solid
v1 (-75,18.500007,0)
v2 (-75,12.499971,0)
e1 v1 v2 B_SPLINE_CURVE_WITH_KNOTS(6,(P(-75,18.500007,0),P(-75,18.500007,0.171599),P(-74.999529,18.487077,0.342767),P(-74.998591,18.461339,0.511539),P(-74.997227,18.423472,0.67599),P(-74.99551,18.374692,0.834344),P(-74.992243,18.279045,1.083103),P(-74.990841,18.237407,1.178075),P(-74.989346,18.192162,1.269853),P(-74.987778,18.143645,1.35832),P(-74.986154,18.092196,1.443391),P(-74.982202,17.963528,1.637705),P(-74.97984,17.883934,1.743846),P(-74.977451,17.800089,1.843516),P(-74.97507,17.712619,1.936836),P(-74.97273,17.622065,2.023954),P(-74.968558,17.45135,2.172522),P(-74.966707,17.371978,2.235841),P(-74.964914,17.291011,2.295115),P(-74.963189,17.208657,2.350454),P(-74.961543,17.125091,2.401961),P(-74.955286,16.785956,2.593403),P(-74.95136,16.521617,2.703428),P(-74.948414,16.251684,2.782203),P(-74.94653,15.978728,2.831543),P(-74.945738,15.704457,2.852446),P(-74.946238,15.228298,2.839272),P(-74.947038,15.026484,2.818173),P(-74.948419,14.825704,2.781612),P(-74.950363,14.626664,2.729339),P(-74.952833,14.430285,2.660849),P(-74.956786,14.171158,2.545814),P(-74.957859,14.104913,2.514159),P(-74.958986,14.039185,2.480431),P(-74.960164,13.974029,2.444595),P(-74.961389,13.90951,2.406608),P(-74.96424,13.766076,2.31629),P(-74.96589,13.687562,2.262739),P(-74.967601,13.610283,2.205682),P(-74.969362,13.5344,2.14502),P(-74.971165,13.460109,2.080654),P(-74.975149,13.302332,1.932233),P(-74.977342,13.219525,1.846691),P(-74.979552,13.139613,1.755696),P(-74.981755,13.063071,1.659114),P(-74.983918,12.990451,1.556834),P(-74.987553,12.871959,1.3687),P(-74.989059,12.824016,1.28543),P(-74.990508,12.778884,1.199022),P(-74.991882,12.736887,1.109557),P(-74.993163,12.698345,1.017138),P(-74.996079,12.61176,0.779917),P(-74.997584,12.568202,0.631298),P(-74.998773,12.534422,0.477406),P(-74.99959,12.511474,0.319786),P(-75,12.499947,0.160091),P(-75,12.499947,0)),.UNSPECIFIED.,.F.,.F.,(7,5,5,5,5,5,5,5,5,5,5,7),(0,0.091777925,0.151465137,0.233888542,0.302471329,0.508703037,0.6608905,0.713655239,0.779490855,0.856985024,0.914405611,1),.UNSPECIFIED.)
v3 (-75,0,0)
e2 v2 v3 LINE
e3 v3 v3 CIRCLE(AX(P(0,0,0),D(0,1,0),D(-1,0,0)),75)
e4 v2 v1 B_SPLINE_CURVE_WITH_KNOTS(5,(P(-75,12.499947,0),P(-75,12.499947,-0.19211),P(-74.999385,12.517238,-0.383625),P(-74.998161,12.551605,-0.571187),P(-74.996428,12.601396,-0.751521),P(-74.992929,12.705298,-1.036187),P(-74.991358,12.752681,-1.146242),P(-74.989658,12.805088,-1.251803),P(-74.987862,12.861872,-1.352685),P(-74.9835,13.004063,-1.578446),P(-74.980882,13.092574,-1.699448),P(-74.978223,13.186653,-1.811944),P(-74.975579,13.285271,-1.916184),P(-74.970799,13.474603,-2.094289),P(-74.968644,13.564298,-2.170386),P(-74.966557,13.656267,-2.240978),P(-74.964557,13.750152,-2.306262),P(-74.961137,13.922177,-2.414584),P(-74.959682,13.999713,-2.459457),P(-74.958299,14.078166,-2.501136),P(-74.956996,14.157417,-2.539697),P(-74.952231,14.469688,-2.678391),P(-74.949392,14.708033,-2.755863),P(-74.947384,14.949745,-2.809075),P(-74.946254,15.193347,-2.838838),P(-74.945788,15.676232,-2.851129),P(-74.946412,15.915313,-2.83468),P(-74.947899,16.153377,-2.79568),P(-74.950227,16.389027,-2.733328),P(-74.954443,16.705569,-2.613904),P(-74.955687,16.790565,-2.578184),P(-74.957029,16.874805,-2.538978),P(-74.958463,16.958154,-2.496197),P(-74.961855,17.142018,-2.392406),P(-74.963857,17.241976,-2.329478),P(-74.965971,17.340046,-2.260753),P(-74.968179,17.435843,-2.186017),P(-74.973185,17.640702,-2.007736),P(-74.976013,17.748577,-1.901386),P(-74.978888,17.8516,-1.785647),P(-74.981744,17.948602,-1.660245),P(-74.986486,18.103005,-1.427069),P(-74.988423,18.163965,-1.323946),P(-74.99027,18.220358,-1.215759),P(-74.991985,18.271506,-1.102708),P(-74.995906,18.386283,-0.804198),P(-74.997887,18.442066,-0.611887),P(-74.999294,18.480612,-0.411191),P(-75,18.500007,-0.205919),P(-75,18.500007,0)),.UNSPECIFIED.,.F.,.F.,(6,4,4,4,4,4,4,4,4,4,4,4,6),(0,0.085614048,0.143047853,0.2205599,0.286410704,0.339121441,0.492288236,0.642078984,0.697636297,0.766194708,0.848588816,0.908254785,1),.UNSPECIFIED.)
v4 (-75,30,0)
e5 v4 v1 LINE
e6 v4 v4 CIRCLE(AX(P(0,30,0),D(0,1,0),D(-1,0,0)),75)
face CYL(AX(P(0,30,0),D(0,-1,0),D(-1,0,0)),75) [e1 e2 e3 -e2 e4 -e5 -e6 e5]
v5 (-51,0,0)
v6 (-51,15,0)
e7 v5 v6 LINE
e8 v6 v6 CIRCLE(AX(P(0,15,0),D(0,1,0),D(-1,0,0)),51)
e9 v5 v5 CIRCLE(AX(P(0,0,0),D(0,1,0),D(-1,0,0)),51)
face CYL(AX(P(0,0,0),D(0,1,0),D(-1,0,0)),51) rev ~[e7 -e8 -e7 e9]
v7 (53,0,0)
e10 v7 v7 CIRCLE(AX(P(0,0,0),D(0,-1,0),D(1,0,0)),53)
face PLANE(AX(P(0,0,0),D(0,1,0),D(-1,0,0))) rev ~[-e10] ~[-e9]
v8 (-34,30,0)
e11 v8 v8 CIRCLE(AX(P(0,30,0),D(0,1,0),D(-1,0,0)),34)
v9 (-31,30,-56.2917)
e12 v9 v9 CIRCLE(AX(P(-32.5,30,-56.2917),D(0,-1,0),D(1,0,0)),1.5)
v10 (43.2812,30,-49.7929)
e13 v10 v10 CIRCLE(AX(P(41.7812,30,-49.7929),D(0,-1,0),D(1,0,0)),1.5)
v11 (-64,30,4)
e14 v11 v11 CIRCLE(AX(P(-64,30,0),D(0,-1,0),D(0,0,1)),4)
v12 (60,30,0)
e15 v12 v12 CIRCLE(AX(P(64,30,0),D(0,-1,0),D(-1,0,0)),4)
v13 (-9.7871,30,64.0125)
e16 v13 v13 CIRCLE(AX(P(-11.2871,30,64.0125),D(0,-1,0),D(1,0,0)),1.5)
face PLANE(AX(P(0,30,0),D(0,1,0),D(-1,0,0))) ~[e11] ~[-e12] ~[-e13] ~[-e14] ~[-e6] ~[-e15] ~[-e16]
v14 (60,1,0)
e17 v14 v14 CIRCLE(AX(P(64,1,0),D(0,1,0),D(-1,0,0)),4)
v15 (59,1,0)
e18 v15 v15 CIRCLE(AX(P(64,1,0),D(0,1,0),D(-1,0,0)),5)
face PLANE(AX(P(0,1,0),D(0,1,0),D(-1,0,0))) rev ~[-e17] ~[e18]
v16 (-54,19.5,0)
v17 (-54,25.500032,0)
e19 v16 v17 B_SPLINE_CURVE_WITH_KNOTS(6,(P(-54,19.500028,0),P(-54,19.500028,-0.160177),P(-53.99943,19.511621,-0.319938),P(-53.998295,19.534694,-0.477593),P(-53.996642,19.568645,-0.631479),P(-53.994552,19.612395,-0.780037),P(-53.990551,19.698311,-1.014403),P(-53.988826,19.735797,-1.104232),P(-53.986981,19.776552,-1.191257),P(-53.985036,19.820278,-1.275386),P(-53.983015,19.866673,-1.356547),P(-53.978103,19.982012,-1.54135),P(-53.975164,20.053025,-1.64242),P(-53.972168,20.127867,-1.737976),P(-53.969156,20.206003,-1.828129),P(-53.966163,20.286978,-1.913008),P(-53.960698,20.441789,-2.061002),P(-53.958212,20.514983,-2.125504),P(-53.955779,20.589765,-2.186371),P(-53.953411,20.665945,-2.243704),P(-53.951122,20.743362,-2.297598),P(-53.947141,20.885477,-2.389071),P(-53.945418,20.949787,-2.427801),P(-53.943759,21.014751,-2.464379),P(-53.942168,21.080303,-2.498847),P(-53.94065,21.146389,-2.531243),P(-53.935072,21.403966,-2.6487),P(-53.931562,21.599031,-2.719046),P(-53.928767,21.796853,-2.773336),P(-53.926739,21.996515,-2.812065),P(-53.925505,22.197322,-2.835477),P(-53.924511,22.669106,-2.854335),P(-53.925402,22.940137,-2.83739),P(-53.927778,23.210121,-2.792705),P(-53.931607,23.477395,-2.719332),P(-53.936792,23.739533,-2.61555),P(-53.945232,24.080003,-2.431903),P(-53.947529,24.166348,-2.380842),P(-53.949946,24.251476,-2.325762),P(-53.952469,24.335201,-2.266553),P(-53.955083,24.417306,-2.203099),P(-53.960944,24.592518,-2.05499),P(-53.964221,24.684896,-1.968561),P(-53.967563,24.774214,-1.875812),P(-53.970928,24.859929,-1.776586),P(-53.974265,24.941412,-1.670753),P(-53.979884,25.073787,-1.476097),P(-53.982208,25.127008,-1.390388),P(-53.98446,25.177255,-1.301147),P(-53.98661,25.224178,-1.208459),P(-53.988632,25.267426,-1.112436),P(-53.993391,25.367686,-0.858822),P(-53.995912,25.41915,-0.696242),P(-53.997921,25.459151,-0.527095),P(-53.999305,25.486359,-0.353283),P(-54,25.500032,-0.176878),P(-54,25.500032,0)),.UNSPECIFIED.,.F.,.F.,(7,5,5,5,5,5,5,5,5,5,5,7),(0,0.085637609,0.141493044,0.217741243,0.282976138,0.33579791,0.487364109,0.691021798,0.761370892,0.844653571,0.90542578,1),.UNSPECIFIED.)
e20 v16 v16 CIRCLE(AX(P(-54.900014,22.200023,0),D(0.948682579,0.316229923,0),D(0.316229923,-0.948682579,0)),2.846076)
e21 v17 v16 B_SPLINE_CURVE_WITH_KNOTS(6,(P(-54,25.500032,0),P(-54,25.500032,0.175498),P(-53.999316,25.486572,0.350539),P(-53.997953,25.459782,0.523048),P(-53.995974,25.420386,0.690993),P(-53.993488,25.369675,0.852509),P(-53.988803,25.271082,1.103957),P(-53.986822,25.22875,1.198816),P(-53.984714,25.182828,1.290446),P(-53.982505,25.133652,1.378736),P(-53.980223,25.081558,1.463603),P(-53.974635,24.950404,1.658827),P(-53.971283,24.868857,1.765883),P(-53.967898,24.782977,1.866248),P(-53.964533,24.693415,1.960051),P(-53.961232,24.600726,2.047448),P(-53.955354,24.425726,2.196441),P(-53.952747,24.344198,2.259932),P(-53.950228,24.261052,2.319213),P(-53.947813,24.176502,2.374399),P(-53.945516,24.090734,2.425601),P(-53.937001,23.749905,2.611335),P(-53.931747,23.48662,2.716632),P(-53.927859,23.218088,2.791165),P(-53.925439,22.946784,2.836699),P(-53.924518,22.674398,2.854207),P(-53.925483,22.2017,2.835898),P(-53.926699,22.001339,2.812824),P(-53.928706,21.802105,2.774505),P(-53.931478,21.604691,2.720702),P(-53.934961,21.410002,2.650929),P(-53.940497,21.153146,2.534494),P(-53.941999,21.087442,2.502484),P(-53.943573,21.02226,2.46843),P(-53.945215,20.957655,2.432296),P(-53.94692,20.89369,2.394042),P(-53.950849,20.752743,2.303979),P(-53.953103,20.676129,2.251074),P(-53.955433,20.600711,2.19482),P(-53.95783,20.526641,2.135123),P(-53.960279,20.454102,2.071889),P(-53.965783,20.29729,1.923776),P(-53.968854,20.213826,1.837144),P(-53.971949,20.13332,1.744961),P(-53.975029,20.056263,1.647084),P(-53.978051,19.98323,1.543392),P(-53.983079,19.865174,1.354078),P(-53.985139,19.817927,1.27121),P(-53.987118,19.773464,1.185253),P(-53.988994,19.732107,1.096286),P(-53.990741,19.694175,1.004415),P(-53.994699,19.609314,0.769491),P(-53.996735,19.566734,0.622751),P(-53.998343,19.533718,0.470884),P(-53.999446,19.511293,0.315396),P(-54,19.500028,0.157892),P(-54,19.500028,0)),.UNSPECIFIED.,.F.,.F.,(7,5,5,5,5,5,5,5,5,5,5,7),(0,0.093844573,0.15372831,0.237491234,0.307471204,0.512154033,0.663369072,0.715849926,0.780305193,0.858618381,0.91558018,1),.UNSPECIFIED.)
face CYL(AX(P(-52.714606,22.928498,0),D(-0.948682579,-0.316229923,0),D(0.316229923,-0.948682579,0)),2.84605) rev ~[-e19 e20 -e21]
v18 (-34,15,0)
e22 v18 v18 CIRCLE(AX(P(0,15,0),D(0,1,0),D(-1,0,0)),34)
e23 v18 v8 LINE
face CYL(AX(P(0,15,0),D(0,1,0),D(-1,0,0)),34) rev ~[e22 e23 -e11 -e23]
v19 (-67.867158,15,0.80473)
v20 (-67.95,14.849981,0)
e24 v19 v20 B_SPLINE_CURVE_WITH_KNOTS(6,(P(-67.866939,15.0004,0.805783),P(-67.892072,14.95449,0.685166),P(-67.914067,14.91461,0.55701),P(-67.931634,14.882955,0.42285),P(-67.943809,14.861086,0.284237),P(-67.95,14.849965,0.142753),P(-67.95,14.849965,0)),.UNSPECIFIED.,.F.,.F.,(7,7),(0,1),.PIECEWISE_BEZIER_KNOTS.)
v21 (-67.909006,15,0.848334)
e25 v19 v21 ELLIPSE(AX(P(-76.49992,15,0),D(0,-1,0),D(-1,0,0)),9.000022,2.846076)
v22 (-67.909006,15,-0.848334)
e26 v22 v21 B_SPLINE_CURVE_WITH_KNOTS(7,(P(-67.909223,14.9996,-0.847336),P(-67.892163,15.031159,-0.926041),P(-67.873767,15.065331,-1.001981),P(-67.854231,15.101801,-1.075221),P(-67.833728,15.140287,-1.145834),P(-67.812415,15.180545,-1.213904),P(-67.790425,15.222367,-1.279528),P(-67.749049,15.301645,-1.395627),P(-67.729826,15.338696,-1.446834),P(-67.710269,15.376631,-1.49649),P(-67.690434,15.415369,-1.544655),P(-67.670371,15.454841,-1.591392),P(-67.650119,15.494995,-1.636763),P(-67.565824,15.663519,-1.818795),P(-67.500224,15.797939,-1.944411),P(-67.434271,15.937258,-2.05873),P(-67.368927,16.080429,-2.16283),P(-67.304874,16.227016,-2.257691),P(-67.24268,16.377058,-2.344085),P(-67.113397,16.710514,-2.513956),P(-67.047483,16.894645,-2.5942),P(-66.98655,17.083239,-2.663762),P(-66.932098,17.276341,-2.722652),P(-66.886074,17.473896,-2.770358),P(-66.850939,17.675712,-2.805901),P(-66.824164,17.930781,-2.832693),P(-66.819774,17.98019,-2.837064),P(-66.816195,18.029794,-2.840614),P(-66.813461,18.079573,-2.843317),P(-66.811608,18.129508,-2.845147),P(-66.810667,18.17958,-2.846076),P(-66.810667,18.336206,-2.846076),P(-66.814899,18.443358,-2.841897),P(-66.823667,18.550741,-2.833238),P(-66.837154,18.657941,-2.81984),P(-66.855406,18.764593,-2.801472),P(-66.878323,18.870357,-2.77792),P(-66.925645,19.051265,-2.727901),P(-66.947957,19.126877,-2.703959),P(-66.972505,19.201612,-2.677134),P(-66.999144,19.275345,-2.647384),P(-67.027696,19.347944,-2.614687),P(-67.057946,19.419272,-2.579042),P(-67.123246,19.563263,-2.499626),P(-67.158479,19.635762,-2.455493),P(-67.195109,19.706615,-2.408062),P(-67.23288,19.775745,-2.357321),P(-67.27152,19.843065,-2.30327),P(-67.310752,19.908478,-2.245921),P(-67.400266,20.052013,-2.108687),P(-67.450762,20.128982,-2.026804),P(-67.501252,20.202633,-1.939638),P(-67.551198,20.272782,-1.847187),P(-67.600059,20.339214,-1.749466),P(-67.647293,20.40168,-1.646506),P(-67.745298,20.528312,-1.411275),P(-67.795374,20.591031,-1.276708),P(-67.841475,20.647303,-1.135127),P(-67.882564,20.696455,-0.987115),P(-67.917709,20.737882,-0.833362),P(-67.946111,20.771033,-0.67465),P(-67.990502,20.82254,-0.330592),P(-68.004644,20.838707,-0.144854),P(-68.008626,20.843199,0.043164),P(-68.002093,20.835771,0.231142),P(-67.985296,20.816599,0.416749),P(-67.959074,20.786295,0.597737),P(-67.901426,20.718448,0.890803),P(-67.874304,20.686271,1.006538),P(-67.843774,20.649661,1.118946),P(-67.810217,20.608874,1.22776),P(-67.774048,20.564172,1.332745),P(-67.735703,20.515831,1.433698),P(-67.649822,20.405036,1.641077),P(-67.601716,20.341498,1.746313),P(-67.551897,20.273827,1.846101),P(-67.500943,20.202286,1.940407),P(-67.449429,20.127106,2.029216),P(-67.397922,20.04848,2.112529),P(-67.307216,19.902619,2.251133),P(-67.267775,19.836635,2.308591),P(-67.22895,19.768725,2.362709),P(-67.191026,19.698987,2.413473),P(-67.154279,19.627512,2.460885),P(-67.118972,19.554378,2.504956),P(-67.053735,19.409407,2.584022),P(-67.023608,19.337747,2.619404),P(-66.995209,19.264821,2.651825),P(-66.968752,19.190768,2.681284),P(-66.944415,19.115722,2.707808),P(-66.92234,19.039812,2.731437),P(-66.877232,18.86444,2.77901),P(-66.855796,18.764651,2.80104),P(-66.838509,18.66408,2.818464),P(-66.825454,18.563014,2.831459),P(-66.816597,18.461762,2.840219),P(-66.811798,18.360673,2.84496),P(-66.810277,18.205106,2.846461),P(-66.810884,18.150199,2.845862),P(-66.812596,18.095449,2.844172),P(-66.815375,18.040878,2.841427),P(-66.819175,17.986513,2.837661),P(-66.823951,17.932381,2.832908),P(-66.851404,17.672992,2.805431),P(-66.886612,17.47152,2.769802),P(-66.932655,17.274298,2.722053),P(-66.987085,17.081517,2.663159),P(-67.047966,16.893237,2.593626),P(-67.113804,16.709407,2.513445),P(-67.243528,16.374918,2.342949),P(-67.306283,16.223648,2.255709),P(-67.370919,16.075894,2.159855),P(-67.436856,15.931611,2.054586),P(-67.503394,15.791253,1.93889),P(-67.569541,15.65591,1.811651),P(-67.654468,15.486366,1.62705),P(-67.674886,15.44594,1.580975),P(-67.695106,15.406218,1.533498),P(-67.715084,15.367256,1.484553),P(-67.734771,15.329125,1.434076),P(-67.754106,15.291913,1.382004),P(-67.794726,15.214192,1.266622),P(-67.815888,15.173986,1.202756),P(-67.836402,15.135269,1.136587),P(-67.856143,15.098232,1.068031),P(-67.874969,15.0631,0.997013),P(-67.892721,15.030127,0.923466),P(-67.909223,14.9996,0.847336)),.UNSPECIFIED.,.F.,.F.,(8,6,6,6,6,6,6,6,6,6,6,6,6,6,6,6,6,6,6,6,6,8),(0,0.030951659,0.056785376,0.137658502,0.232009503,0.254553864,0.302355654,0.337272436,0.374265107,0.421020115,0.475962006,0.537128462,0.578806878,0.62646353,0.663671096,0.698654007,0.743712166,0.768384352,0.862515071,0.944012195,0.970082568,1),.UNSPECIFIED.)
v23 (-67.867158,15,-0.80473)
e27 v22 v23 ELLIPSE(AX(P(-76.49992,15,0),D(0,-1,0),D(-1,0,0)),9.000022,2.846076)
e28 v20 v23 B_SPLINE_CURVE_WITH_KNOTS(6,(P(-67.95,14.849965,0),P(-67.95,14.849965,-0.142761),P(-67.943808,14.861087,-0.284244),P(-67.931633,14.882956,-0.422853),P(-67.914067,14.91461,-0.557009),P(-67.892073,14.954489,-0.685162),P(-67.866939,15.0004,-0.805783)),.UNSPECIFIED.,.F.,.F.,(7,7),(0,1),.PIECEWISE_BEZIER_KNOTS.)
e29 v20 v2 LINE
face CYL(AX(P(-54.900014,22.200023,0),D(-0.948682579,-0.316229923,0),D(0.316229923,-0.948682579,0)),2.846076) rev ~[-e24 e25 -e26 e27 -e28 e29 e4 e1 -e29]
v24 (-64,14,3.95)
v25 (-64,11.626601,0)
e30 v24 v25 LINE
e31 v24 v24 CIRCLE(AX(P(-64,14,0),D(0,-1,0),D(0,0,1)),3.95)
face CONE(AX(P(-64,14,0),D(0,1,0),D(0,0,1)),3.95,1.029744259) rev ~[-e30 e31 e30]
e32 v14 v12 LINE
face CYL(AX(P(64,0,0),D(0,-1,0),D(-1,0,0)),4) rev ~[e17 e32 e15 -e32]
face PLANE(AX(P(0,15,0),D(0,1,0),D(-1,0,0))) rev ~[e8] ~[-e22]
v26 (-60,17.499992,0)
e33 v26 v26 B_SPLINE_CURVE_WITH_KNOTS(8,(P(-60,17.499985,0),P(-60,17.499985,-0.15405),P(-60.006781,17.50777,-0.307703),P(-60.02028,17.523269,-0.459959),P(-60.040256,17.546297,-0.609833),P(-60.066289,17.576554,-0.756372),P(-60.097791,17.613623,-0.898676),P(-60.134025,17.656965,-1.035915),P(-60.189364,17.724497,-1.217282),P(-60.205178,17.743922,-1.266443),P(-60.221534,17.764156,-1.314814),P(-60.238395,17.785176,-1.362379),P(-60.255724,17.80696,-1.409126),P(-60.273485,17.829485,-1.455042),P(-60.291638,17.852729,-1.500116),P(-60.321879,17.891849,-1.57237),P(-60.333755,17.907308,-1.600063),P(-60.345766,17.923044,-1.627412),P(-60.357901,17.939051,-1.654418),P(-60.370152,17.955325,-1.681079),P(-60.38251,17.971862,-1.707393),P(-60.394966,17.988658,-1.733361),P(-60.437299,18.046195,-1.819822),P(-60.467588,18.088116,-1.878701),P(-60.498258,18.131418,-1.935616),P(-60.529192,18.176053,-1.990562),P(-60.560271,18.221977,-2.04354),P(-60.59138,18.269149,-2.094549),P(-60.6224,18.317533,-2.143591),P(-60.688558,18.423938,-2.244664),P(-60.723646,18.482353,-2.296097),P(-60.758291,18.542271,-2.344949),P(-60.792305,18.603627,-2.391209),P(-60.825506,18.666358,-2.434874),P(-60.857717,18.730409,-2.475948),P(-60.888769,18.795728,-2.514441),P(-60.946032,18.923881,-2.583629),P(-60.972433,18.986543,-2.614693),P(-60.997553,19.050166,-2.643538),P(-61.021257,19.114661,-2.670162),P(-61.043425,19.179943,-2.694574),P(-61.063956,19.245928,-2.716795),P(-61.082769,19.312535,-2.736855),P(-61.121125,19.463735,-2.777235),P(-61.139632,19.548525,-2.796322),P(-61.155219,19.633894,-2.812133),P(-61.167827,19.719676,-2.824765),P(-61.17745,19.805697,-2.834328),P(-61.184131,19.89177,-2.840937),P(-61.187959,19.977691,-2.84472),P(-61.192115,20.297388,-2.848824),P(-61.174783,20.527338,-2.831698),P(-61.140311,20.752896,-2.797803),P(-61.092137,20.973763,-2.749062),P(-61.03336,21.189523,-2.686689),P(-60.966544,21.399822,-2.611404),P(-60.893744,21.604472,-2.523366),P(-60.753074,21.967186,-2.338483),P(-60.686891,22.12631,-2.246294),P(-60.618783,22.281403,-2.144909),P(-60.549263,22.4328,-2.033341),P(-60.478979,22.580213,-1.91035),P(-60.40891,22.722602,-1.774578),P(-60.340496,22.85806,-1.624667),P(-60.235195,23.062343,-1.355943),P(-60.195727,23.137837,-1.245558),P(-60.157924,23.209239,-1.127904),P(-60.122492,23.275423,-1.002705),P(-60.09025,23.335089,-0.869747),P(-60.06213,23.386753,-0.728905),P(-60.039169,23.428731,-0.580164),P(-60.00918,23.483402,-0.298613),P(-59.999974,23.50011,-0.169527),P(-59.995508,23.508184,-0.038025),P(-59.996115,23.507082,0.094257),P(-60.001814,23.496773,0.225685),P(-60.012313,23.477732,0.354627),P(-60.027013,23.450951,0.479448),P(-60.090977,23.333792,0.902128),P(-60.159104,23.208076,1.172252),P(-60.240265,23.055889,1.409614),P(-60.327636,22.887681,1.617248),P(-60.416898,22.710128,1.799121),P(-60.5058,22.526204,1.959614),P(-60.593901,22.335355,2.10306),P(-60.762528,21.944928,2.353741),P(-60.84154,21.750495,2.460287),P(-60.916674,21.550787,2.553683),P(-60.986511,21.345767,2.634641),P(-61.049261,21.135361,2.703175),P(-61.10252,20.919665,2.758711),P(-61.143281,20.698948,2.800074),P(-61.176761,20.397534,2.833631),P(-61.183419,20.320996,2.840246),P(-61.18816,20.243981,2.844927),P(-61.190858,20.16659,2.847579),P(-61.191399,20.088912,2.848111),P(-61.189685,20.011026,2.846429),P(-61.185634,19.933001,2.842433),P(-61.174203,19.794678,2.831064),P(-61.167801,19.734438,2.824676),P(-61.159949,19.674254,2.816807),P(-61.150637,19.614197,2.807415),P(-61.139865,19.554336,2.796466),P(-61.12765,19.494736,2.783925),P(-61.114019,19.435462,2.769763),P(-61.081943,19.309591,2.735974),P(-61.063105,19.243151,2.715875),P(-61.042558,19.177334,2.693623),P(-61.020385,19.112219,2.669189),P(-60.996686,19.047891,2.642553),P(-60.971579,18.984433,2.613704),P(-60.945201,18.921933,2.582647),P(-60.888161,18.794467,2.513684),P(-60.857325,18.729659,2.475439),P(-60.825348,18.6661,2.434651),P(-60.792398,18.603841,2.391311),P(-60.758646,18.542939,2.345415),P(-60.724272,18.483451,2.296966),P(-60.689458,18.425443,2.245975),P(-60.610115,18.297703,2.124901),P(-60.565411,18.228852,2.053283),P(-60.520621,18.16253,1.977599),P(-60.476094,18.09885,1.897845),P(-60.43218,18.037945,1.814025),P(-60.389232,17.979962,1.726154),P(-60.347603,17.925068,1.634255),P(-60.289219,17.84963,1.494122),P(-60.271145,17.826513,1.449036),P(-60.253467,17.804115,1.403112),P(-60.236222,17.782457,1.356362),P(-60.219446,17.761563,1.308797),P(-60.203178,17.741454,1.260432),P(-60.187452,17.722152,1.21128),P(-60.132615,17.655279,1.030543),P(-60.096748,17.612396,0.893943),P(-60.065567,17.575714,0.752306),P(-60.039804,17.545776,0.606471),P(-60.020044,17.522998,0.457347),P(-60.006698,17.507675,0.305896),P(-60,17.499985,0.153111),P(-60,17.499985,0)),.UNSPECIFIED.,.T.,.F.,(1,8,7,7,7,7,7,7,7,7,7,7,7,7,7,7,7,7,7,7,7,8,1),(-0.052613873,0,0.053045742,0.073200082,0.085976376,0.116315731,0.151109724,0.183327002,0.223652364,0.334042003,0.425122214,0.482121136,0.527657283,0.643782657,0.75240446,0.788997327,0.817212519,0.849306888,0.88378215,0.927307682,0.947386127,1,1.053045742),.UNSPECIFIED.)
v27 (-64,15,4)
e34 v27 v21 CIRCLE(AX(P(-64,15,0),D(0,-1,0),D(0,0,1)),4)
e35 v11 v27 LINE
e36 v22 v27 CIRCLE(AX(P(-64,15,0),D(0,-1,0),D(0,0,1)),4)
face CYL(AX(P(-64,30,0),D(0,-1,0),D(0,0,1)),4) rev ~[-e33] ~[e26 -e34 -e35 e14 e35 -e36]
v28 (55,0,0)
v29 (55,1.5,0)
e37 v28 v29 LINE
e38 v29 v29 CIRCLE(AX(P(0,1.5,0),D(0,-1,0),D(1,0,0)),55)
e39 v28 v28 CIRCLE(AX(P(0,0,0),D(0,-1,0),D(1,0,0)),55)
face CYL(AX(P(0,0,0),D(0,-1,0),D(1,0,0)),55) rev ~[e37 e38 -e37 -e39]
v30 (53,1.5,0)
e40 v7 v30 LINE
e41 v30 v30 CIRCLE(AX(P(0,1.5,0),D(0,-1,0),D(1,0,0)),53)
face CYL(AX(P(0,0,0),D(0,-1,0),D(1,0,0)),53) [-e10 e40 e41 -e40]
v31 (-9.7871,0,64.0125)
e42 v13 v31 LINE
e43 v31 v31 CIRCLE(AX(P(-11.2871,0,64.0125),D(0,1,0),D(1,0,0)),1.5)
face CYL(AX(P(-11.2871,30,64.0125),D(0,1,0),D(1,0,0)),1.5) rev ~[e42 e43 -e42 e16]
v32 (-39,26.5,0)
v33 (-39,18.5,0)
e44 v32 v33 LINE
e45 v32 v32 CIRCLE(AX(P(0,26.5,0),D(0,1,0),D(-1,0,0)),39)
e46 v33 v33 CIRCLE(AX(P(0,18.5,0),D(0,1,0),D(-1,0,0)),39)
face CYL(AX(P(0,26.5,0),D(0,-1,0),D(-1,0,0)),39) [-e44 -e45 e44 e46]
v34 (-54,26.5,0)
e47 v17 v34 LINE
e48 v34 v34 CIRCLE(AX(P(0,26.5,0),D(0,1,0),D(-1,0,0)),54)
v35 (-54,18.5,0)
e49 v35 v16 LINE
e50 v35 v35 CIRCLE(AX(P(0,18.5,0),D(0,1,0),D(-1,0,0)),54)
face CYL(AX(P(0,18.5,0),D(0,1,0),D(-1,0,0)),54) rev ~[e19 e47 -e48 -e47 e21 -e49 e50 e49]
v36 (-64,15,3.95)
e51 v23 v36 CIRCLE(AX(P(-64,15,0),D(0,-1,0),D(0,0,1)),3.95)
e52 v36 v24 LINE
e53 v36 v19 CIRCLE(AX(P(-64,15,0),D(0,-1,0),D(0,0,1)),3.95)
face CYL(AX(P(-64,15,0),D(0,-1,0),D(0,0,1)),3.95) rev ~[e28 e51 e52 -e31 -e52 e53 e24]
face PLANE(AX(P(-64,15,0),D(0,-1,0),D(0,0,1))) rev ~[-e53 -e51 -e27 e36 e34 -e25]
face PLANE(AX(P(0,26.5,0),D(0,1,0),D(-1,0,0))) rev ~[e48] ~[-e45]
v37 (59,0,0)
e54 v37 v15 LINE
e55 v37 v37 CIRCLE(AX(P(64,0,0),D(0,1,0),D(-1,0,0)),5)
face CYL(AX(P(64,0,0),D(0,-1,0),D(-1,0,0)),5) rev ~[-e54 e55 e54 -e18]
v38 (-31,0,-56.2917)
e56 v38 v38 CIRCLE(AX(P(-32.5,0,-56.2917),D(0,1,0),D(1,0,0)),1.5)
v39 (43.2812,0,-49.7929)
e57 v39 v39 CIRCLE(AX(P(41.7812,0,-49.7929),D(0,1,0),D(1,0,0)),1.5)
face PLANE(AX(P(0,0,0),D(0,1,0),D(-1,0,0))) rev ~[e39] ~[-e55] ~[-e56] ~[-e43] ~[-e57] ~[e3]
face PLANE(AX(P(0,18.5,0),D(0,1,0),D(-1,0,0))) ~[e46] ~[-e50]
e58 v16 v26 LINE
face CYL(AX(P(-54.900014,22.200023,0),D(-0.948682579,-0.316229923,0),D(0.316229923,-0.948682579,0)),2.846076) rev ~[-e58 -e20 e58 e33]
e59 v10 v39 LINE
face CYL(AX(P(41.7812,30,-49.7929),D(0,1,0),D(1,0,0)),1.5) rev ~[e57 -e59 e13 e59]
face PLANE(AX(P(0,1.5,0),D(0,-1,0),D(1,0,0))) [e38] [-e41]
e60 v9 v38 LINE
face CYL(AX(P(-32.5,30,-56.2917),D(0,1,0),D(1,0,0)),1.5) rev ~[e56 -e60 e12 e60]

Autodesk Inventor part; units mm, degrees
ref_plane "YZ Plane" through (0, 0, 0) normal (1, 0, 0) x (0, 1, 0)
ref_plane "XZ Plane" through (0, 0, 0) normal (0, 1, 0) x (-1, 0, 0)
ref_plane "XY Plane" through (0, 0, 0) normal (0, 0, 1) x (1, 0, 0)
sketch "Эскиз1" plane through (0, 0, 0) normal (0, 0, 1) x (1, 0, 0)
  line L0 (0, 0) -> (0, 20)
  line L1 (0, 0) -> (0, 24)
  line L2 (0, 0) -> (0, 30)
  line L3 (0, 30) -> (-75, 30)
  line L4 (-75, 30) -> (-75, 0)
  line L5 (-75, 0) -> (-51, 0)
  line L6 (-51, 0) -> (-51, 15)
  line L7 (-51, 15) -> (-34, 15)
  line L8 (-34, 15) -> (-34, 30)
  line L9 (-54, 26.5) -> (-39, 26.5)
  line L10 (-39, 26.5) -> (-39, 18.5)
  line L11 (-39, 18.5) -> (-54, 18.5)
  line L12 (-54, 18.5) -> (-54, 26.5)
  dimension "d20" = 30
  dimension "d21" = 75
  dimension "d22" = 24
  dimension "d23" = 15
  dimension "d24" = 17
  dimension "d44" = 8
  dimension "d45" = 3.5
revolve "Вращение1" add sketch "Эскиз1" angle 360 about axis through (0, 0, 0) along (0, 1, 0)
sketch "Эскиз2" plane through (0, 30, 0) normal (0, 1, 0) x (1, 0, 0)
  circle A0 centre (0, 0) radius 32 projected
  circle A1 centre (0, 0) radius 69 projected
  line L0 (0, 0) -> (41.7812, 49.7929)
  line L1 (0, 0) -> (65, 0) construction
  circle A2 centre (41.7812, 49.7929) radius 1.5
  line L2 (0, 0) -> (-32.5, 56.2917)
  line L3 (0, 0) -> (65, 0) construction
  circle A3 centre (-32.5, 56.2917) radius 1.5
  line L4 (0, 0) -> (-11.2871, -64.0125)
  line L5 (0, 0) -> (65, 0) construction
  circle A4 centre (-11.2871, -64.0125) radius 1.5
  dimension "d8" = 65
  dimension "d9" = 50
  dimension "d10" = 3
  dimension "d11" = 65
  dimension "d12" = 120
  dimension "d13" = 3
  dimension "d14" = 65
  dimension "d15" = 100
  dimension "d16" = 3
extrude "Выдавливание1" cut sketch "Эскиз2" against normal through all contours A2 | A3 | A4
sketch "Эскиз3" plane through (0, 0, 0) normal (0, 1, 0) x (-1, 0, 0)
  circle A0 centre (11.2871, 64.0125) radius 1.5 projected
  circle A1 centre (-41.7812, -49.7929) radius 1.5 projected
  circle A2 centre (32.5, -56.2917) radius 1.5 projected
  circle A3 centre (0, 0) radius 75 projected
  circle A4 centre (0, 0) radius 34 projected
  circle A5 centre (-64, 0) radius 4
  dimension "d46" = 64
  dimension "d47" = 8
extrude "Выдавливание2" cut sketch "Эскиз3" along normal through all contours A5
sketch "Эскиз4" plane through (0, 0, 0) normal (0, 1, 0) x (-1, 0, 0)
  circle A0 centre (-64, 0) radius 4 projected
  circle A1 centre (-64, 0) radius 5
  point P0 (0, 0)
  dimension "d27" = 10
extrude "Выдавливание3" cut sketch "Эскиз4" along normal blind 1
sketch "Эскиз5" plane through (0, 30, 0) normal (0, 1, 0) x (-1, 0, 0)
  line L0 (0, 0) -> (64, 0)
  dimension "d30" = 64
hole "Отверстие1" at (-64, 30, 0) direction (0, -1, 0) diameter 7.9 depth 16 tip angle 118 counterbore diameter 8 counterbore depth 15
sketch "Эскиз6" plane through (0, 0, 0) normal (0, 0, 1) x (1, 0, 0)
  line L0 (-54, 18.5) -> (54, 18.5) projected
  line L1 (-60, 15) -> (-60, 30) projected
  line L2 (-54, 18.5) -> (-60, 18.5)
  line L3 (-60, 18.5) -> (-60, 20.5)
  line L4 (-60, 15) -> (-60, 30) projected
  line L5 (-60, 20.5) -> (-54, 22.5)
  line L6 (-54, 18.5) -> (-54, 26.5) projected
  line L7 (-54, 22.5) -> (-54, 19.5)
  line L8 (-54, 18.5) -> (-54, 26.5) projected
  line L9 (-54, 19.5) -> (-78.2024, 11.4325)
  line L10 (-78.2024, 11.4325) -> (-79.1024, 14.1325)
  line L11 (-79.1024, 14.1325) -> (-52.7146, 22.9285)
  line L12 (-52.7146, 22.9285) -> (-51.8146, 20.2285)
  line L13 (-51.8146, 20.2285) -> (-54, 19.5)
  point P0 (0, 0)
  dimension "d52" = 2
  dimension "d53" = 3
revolve "Вращение2" cut sketch "Эскиз6" angle 360 about axis through (-79.1024, 14.1325, 0) along (0.9486833, 0.3162278, 0) contours L1 L9 L10 L11 | L2 L9 L1 | L1 L5 L6 L9 L2 | L11 L12 L13 L6
sketch "Эскиз7" plane through (0, 0, 0) normal (0, -1, 0) x (1, 0, 0)
  circle A0 centre (0, 0) radius 53
  circle A1 centre (0, 0) radius 55
  dimension "d48" = 106
  dimension "d49" = 110
extrude "Выдавливание4" cut sketch "Эскиз7" against normal blind 1.5
properties part number "Корпус сальника 3" material "Чугун, серый"
